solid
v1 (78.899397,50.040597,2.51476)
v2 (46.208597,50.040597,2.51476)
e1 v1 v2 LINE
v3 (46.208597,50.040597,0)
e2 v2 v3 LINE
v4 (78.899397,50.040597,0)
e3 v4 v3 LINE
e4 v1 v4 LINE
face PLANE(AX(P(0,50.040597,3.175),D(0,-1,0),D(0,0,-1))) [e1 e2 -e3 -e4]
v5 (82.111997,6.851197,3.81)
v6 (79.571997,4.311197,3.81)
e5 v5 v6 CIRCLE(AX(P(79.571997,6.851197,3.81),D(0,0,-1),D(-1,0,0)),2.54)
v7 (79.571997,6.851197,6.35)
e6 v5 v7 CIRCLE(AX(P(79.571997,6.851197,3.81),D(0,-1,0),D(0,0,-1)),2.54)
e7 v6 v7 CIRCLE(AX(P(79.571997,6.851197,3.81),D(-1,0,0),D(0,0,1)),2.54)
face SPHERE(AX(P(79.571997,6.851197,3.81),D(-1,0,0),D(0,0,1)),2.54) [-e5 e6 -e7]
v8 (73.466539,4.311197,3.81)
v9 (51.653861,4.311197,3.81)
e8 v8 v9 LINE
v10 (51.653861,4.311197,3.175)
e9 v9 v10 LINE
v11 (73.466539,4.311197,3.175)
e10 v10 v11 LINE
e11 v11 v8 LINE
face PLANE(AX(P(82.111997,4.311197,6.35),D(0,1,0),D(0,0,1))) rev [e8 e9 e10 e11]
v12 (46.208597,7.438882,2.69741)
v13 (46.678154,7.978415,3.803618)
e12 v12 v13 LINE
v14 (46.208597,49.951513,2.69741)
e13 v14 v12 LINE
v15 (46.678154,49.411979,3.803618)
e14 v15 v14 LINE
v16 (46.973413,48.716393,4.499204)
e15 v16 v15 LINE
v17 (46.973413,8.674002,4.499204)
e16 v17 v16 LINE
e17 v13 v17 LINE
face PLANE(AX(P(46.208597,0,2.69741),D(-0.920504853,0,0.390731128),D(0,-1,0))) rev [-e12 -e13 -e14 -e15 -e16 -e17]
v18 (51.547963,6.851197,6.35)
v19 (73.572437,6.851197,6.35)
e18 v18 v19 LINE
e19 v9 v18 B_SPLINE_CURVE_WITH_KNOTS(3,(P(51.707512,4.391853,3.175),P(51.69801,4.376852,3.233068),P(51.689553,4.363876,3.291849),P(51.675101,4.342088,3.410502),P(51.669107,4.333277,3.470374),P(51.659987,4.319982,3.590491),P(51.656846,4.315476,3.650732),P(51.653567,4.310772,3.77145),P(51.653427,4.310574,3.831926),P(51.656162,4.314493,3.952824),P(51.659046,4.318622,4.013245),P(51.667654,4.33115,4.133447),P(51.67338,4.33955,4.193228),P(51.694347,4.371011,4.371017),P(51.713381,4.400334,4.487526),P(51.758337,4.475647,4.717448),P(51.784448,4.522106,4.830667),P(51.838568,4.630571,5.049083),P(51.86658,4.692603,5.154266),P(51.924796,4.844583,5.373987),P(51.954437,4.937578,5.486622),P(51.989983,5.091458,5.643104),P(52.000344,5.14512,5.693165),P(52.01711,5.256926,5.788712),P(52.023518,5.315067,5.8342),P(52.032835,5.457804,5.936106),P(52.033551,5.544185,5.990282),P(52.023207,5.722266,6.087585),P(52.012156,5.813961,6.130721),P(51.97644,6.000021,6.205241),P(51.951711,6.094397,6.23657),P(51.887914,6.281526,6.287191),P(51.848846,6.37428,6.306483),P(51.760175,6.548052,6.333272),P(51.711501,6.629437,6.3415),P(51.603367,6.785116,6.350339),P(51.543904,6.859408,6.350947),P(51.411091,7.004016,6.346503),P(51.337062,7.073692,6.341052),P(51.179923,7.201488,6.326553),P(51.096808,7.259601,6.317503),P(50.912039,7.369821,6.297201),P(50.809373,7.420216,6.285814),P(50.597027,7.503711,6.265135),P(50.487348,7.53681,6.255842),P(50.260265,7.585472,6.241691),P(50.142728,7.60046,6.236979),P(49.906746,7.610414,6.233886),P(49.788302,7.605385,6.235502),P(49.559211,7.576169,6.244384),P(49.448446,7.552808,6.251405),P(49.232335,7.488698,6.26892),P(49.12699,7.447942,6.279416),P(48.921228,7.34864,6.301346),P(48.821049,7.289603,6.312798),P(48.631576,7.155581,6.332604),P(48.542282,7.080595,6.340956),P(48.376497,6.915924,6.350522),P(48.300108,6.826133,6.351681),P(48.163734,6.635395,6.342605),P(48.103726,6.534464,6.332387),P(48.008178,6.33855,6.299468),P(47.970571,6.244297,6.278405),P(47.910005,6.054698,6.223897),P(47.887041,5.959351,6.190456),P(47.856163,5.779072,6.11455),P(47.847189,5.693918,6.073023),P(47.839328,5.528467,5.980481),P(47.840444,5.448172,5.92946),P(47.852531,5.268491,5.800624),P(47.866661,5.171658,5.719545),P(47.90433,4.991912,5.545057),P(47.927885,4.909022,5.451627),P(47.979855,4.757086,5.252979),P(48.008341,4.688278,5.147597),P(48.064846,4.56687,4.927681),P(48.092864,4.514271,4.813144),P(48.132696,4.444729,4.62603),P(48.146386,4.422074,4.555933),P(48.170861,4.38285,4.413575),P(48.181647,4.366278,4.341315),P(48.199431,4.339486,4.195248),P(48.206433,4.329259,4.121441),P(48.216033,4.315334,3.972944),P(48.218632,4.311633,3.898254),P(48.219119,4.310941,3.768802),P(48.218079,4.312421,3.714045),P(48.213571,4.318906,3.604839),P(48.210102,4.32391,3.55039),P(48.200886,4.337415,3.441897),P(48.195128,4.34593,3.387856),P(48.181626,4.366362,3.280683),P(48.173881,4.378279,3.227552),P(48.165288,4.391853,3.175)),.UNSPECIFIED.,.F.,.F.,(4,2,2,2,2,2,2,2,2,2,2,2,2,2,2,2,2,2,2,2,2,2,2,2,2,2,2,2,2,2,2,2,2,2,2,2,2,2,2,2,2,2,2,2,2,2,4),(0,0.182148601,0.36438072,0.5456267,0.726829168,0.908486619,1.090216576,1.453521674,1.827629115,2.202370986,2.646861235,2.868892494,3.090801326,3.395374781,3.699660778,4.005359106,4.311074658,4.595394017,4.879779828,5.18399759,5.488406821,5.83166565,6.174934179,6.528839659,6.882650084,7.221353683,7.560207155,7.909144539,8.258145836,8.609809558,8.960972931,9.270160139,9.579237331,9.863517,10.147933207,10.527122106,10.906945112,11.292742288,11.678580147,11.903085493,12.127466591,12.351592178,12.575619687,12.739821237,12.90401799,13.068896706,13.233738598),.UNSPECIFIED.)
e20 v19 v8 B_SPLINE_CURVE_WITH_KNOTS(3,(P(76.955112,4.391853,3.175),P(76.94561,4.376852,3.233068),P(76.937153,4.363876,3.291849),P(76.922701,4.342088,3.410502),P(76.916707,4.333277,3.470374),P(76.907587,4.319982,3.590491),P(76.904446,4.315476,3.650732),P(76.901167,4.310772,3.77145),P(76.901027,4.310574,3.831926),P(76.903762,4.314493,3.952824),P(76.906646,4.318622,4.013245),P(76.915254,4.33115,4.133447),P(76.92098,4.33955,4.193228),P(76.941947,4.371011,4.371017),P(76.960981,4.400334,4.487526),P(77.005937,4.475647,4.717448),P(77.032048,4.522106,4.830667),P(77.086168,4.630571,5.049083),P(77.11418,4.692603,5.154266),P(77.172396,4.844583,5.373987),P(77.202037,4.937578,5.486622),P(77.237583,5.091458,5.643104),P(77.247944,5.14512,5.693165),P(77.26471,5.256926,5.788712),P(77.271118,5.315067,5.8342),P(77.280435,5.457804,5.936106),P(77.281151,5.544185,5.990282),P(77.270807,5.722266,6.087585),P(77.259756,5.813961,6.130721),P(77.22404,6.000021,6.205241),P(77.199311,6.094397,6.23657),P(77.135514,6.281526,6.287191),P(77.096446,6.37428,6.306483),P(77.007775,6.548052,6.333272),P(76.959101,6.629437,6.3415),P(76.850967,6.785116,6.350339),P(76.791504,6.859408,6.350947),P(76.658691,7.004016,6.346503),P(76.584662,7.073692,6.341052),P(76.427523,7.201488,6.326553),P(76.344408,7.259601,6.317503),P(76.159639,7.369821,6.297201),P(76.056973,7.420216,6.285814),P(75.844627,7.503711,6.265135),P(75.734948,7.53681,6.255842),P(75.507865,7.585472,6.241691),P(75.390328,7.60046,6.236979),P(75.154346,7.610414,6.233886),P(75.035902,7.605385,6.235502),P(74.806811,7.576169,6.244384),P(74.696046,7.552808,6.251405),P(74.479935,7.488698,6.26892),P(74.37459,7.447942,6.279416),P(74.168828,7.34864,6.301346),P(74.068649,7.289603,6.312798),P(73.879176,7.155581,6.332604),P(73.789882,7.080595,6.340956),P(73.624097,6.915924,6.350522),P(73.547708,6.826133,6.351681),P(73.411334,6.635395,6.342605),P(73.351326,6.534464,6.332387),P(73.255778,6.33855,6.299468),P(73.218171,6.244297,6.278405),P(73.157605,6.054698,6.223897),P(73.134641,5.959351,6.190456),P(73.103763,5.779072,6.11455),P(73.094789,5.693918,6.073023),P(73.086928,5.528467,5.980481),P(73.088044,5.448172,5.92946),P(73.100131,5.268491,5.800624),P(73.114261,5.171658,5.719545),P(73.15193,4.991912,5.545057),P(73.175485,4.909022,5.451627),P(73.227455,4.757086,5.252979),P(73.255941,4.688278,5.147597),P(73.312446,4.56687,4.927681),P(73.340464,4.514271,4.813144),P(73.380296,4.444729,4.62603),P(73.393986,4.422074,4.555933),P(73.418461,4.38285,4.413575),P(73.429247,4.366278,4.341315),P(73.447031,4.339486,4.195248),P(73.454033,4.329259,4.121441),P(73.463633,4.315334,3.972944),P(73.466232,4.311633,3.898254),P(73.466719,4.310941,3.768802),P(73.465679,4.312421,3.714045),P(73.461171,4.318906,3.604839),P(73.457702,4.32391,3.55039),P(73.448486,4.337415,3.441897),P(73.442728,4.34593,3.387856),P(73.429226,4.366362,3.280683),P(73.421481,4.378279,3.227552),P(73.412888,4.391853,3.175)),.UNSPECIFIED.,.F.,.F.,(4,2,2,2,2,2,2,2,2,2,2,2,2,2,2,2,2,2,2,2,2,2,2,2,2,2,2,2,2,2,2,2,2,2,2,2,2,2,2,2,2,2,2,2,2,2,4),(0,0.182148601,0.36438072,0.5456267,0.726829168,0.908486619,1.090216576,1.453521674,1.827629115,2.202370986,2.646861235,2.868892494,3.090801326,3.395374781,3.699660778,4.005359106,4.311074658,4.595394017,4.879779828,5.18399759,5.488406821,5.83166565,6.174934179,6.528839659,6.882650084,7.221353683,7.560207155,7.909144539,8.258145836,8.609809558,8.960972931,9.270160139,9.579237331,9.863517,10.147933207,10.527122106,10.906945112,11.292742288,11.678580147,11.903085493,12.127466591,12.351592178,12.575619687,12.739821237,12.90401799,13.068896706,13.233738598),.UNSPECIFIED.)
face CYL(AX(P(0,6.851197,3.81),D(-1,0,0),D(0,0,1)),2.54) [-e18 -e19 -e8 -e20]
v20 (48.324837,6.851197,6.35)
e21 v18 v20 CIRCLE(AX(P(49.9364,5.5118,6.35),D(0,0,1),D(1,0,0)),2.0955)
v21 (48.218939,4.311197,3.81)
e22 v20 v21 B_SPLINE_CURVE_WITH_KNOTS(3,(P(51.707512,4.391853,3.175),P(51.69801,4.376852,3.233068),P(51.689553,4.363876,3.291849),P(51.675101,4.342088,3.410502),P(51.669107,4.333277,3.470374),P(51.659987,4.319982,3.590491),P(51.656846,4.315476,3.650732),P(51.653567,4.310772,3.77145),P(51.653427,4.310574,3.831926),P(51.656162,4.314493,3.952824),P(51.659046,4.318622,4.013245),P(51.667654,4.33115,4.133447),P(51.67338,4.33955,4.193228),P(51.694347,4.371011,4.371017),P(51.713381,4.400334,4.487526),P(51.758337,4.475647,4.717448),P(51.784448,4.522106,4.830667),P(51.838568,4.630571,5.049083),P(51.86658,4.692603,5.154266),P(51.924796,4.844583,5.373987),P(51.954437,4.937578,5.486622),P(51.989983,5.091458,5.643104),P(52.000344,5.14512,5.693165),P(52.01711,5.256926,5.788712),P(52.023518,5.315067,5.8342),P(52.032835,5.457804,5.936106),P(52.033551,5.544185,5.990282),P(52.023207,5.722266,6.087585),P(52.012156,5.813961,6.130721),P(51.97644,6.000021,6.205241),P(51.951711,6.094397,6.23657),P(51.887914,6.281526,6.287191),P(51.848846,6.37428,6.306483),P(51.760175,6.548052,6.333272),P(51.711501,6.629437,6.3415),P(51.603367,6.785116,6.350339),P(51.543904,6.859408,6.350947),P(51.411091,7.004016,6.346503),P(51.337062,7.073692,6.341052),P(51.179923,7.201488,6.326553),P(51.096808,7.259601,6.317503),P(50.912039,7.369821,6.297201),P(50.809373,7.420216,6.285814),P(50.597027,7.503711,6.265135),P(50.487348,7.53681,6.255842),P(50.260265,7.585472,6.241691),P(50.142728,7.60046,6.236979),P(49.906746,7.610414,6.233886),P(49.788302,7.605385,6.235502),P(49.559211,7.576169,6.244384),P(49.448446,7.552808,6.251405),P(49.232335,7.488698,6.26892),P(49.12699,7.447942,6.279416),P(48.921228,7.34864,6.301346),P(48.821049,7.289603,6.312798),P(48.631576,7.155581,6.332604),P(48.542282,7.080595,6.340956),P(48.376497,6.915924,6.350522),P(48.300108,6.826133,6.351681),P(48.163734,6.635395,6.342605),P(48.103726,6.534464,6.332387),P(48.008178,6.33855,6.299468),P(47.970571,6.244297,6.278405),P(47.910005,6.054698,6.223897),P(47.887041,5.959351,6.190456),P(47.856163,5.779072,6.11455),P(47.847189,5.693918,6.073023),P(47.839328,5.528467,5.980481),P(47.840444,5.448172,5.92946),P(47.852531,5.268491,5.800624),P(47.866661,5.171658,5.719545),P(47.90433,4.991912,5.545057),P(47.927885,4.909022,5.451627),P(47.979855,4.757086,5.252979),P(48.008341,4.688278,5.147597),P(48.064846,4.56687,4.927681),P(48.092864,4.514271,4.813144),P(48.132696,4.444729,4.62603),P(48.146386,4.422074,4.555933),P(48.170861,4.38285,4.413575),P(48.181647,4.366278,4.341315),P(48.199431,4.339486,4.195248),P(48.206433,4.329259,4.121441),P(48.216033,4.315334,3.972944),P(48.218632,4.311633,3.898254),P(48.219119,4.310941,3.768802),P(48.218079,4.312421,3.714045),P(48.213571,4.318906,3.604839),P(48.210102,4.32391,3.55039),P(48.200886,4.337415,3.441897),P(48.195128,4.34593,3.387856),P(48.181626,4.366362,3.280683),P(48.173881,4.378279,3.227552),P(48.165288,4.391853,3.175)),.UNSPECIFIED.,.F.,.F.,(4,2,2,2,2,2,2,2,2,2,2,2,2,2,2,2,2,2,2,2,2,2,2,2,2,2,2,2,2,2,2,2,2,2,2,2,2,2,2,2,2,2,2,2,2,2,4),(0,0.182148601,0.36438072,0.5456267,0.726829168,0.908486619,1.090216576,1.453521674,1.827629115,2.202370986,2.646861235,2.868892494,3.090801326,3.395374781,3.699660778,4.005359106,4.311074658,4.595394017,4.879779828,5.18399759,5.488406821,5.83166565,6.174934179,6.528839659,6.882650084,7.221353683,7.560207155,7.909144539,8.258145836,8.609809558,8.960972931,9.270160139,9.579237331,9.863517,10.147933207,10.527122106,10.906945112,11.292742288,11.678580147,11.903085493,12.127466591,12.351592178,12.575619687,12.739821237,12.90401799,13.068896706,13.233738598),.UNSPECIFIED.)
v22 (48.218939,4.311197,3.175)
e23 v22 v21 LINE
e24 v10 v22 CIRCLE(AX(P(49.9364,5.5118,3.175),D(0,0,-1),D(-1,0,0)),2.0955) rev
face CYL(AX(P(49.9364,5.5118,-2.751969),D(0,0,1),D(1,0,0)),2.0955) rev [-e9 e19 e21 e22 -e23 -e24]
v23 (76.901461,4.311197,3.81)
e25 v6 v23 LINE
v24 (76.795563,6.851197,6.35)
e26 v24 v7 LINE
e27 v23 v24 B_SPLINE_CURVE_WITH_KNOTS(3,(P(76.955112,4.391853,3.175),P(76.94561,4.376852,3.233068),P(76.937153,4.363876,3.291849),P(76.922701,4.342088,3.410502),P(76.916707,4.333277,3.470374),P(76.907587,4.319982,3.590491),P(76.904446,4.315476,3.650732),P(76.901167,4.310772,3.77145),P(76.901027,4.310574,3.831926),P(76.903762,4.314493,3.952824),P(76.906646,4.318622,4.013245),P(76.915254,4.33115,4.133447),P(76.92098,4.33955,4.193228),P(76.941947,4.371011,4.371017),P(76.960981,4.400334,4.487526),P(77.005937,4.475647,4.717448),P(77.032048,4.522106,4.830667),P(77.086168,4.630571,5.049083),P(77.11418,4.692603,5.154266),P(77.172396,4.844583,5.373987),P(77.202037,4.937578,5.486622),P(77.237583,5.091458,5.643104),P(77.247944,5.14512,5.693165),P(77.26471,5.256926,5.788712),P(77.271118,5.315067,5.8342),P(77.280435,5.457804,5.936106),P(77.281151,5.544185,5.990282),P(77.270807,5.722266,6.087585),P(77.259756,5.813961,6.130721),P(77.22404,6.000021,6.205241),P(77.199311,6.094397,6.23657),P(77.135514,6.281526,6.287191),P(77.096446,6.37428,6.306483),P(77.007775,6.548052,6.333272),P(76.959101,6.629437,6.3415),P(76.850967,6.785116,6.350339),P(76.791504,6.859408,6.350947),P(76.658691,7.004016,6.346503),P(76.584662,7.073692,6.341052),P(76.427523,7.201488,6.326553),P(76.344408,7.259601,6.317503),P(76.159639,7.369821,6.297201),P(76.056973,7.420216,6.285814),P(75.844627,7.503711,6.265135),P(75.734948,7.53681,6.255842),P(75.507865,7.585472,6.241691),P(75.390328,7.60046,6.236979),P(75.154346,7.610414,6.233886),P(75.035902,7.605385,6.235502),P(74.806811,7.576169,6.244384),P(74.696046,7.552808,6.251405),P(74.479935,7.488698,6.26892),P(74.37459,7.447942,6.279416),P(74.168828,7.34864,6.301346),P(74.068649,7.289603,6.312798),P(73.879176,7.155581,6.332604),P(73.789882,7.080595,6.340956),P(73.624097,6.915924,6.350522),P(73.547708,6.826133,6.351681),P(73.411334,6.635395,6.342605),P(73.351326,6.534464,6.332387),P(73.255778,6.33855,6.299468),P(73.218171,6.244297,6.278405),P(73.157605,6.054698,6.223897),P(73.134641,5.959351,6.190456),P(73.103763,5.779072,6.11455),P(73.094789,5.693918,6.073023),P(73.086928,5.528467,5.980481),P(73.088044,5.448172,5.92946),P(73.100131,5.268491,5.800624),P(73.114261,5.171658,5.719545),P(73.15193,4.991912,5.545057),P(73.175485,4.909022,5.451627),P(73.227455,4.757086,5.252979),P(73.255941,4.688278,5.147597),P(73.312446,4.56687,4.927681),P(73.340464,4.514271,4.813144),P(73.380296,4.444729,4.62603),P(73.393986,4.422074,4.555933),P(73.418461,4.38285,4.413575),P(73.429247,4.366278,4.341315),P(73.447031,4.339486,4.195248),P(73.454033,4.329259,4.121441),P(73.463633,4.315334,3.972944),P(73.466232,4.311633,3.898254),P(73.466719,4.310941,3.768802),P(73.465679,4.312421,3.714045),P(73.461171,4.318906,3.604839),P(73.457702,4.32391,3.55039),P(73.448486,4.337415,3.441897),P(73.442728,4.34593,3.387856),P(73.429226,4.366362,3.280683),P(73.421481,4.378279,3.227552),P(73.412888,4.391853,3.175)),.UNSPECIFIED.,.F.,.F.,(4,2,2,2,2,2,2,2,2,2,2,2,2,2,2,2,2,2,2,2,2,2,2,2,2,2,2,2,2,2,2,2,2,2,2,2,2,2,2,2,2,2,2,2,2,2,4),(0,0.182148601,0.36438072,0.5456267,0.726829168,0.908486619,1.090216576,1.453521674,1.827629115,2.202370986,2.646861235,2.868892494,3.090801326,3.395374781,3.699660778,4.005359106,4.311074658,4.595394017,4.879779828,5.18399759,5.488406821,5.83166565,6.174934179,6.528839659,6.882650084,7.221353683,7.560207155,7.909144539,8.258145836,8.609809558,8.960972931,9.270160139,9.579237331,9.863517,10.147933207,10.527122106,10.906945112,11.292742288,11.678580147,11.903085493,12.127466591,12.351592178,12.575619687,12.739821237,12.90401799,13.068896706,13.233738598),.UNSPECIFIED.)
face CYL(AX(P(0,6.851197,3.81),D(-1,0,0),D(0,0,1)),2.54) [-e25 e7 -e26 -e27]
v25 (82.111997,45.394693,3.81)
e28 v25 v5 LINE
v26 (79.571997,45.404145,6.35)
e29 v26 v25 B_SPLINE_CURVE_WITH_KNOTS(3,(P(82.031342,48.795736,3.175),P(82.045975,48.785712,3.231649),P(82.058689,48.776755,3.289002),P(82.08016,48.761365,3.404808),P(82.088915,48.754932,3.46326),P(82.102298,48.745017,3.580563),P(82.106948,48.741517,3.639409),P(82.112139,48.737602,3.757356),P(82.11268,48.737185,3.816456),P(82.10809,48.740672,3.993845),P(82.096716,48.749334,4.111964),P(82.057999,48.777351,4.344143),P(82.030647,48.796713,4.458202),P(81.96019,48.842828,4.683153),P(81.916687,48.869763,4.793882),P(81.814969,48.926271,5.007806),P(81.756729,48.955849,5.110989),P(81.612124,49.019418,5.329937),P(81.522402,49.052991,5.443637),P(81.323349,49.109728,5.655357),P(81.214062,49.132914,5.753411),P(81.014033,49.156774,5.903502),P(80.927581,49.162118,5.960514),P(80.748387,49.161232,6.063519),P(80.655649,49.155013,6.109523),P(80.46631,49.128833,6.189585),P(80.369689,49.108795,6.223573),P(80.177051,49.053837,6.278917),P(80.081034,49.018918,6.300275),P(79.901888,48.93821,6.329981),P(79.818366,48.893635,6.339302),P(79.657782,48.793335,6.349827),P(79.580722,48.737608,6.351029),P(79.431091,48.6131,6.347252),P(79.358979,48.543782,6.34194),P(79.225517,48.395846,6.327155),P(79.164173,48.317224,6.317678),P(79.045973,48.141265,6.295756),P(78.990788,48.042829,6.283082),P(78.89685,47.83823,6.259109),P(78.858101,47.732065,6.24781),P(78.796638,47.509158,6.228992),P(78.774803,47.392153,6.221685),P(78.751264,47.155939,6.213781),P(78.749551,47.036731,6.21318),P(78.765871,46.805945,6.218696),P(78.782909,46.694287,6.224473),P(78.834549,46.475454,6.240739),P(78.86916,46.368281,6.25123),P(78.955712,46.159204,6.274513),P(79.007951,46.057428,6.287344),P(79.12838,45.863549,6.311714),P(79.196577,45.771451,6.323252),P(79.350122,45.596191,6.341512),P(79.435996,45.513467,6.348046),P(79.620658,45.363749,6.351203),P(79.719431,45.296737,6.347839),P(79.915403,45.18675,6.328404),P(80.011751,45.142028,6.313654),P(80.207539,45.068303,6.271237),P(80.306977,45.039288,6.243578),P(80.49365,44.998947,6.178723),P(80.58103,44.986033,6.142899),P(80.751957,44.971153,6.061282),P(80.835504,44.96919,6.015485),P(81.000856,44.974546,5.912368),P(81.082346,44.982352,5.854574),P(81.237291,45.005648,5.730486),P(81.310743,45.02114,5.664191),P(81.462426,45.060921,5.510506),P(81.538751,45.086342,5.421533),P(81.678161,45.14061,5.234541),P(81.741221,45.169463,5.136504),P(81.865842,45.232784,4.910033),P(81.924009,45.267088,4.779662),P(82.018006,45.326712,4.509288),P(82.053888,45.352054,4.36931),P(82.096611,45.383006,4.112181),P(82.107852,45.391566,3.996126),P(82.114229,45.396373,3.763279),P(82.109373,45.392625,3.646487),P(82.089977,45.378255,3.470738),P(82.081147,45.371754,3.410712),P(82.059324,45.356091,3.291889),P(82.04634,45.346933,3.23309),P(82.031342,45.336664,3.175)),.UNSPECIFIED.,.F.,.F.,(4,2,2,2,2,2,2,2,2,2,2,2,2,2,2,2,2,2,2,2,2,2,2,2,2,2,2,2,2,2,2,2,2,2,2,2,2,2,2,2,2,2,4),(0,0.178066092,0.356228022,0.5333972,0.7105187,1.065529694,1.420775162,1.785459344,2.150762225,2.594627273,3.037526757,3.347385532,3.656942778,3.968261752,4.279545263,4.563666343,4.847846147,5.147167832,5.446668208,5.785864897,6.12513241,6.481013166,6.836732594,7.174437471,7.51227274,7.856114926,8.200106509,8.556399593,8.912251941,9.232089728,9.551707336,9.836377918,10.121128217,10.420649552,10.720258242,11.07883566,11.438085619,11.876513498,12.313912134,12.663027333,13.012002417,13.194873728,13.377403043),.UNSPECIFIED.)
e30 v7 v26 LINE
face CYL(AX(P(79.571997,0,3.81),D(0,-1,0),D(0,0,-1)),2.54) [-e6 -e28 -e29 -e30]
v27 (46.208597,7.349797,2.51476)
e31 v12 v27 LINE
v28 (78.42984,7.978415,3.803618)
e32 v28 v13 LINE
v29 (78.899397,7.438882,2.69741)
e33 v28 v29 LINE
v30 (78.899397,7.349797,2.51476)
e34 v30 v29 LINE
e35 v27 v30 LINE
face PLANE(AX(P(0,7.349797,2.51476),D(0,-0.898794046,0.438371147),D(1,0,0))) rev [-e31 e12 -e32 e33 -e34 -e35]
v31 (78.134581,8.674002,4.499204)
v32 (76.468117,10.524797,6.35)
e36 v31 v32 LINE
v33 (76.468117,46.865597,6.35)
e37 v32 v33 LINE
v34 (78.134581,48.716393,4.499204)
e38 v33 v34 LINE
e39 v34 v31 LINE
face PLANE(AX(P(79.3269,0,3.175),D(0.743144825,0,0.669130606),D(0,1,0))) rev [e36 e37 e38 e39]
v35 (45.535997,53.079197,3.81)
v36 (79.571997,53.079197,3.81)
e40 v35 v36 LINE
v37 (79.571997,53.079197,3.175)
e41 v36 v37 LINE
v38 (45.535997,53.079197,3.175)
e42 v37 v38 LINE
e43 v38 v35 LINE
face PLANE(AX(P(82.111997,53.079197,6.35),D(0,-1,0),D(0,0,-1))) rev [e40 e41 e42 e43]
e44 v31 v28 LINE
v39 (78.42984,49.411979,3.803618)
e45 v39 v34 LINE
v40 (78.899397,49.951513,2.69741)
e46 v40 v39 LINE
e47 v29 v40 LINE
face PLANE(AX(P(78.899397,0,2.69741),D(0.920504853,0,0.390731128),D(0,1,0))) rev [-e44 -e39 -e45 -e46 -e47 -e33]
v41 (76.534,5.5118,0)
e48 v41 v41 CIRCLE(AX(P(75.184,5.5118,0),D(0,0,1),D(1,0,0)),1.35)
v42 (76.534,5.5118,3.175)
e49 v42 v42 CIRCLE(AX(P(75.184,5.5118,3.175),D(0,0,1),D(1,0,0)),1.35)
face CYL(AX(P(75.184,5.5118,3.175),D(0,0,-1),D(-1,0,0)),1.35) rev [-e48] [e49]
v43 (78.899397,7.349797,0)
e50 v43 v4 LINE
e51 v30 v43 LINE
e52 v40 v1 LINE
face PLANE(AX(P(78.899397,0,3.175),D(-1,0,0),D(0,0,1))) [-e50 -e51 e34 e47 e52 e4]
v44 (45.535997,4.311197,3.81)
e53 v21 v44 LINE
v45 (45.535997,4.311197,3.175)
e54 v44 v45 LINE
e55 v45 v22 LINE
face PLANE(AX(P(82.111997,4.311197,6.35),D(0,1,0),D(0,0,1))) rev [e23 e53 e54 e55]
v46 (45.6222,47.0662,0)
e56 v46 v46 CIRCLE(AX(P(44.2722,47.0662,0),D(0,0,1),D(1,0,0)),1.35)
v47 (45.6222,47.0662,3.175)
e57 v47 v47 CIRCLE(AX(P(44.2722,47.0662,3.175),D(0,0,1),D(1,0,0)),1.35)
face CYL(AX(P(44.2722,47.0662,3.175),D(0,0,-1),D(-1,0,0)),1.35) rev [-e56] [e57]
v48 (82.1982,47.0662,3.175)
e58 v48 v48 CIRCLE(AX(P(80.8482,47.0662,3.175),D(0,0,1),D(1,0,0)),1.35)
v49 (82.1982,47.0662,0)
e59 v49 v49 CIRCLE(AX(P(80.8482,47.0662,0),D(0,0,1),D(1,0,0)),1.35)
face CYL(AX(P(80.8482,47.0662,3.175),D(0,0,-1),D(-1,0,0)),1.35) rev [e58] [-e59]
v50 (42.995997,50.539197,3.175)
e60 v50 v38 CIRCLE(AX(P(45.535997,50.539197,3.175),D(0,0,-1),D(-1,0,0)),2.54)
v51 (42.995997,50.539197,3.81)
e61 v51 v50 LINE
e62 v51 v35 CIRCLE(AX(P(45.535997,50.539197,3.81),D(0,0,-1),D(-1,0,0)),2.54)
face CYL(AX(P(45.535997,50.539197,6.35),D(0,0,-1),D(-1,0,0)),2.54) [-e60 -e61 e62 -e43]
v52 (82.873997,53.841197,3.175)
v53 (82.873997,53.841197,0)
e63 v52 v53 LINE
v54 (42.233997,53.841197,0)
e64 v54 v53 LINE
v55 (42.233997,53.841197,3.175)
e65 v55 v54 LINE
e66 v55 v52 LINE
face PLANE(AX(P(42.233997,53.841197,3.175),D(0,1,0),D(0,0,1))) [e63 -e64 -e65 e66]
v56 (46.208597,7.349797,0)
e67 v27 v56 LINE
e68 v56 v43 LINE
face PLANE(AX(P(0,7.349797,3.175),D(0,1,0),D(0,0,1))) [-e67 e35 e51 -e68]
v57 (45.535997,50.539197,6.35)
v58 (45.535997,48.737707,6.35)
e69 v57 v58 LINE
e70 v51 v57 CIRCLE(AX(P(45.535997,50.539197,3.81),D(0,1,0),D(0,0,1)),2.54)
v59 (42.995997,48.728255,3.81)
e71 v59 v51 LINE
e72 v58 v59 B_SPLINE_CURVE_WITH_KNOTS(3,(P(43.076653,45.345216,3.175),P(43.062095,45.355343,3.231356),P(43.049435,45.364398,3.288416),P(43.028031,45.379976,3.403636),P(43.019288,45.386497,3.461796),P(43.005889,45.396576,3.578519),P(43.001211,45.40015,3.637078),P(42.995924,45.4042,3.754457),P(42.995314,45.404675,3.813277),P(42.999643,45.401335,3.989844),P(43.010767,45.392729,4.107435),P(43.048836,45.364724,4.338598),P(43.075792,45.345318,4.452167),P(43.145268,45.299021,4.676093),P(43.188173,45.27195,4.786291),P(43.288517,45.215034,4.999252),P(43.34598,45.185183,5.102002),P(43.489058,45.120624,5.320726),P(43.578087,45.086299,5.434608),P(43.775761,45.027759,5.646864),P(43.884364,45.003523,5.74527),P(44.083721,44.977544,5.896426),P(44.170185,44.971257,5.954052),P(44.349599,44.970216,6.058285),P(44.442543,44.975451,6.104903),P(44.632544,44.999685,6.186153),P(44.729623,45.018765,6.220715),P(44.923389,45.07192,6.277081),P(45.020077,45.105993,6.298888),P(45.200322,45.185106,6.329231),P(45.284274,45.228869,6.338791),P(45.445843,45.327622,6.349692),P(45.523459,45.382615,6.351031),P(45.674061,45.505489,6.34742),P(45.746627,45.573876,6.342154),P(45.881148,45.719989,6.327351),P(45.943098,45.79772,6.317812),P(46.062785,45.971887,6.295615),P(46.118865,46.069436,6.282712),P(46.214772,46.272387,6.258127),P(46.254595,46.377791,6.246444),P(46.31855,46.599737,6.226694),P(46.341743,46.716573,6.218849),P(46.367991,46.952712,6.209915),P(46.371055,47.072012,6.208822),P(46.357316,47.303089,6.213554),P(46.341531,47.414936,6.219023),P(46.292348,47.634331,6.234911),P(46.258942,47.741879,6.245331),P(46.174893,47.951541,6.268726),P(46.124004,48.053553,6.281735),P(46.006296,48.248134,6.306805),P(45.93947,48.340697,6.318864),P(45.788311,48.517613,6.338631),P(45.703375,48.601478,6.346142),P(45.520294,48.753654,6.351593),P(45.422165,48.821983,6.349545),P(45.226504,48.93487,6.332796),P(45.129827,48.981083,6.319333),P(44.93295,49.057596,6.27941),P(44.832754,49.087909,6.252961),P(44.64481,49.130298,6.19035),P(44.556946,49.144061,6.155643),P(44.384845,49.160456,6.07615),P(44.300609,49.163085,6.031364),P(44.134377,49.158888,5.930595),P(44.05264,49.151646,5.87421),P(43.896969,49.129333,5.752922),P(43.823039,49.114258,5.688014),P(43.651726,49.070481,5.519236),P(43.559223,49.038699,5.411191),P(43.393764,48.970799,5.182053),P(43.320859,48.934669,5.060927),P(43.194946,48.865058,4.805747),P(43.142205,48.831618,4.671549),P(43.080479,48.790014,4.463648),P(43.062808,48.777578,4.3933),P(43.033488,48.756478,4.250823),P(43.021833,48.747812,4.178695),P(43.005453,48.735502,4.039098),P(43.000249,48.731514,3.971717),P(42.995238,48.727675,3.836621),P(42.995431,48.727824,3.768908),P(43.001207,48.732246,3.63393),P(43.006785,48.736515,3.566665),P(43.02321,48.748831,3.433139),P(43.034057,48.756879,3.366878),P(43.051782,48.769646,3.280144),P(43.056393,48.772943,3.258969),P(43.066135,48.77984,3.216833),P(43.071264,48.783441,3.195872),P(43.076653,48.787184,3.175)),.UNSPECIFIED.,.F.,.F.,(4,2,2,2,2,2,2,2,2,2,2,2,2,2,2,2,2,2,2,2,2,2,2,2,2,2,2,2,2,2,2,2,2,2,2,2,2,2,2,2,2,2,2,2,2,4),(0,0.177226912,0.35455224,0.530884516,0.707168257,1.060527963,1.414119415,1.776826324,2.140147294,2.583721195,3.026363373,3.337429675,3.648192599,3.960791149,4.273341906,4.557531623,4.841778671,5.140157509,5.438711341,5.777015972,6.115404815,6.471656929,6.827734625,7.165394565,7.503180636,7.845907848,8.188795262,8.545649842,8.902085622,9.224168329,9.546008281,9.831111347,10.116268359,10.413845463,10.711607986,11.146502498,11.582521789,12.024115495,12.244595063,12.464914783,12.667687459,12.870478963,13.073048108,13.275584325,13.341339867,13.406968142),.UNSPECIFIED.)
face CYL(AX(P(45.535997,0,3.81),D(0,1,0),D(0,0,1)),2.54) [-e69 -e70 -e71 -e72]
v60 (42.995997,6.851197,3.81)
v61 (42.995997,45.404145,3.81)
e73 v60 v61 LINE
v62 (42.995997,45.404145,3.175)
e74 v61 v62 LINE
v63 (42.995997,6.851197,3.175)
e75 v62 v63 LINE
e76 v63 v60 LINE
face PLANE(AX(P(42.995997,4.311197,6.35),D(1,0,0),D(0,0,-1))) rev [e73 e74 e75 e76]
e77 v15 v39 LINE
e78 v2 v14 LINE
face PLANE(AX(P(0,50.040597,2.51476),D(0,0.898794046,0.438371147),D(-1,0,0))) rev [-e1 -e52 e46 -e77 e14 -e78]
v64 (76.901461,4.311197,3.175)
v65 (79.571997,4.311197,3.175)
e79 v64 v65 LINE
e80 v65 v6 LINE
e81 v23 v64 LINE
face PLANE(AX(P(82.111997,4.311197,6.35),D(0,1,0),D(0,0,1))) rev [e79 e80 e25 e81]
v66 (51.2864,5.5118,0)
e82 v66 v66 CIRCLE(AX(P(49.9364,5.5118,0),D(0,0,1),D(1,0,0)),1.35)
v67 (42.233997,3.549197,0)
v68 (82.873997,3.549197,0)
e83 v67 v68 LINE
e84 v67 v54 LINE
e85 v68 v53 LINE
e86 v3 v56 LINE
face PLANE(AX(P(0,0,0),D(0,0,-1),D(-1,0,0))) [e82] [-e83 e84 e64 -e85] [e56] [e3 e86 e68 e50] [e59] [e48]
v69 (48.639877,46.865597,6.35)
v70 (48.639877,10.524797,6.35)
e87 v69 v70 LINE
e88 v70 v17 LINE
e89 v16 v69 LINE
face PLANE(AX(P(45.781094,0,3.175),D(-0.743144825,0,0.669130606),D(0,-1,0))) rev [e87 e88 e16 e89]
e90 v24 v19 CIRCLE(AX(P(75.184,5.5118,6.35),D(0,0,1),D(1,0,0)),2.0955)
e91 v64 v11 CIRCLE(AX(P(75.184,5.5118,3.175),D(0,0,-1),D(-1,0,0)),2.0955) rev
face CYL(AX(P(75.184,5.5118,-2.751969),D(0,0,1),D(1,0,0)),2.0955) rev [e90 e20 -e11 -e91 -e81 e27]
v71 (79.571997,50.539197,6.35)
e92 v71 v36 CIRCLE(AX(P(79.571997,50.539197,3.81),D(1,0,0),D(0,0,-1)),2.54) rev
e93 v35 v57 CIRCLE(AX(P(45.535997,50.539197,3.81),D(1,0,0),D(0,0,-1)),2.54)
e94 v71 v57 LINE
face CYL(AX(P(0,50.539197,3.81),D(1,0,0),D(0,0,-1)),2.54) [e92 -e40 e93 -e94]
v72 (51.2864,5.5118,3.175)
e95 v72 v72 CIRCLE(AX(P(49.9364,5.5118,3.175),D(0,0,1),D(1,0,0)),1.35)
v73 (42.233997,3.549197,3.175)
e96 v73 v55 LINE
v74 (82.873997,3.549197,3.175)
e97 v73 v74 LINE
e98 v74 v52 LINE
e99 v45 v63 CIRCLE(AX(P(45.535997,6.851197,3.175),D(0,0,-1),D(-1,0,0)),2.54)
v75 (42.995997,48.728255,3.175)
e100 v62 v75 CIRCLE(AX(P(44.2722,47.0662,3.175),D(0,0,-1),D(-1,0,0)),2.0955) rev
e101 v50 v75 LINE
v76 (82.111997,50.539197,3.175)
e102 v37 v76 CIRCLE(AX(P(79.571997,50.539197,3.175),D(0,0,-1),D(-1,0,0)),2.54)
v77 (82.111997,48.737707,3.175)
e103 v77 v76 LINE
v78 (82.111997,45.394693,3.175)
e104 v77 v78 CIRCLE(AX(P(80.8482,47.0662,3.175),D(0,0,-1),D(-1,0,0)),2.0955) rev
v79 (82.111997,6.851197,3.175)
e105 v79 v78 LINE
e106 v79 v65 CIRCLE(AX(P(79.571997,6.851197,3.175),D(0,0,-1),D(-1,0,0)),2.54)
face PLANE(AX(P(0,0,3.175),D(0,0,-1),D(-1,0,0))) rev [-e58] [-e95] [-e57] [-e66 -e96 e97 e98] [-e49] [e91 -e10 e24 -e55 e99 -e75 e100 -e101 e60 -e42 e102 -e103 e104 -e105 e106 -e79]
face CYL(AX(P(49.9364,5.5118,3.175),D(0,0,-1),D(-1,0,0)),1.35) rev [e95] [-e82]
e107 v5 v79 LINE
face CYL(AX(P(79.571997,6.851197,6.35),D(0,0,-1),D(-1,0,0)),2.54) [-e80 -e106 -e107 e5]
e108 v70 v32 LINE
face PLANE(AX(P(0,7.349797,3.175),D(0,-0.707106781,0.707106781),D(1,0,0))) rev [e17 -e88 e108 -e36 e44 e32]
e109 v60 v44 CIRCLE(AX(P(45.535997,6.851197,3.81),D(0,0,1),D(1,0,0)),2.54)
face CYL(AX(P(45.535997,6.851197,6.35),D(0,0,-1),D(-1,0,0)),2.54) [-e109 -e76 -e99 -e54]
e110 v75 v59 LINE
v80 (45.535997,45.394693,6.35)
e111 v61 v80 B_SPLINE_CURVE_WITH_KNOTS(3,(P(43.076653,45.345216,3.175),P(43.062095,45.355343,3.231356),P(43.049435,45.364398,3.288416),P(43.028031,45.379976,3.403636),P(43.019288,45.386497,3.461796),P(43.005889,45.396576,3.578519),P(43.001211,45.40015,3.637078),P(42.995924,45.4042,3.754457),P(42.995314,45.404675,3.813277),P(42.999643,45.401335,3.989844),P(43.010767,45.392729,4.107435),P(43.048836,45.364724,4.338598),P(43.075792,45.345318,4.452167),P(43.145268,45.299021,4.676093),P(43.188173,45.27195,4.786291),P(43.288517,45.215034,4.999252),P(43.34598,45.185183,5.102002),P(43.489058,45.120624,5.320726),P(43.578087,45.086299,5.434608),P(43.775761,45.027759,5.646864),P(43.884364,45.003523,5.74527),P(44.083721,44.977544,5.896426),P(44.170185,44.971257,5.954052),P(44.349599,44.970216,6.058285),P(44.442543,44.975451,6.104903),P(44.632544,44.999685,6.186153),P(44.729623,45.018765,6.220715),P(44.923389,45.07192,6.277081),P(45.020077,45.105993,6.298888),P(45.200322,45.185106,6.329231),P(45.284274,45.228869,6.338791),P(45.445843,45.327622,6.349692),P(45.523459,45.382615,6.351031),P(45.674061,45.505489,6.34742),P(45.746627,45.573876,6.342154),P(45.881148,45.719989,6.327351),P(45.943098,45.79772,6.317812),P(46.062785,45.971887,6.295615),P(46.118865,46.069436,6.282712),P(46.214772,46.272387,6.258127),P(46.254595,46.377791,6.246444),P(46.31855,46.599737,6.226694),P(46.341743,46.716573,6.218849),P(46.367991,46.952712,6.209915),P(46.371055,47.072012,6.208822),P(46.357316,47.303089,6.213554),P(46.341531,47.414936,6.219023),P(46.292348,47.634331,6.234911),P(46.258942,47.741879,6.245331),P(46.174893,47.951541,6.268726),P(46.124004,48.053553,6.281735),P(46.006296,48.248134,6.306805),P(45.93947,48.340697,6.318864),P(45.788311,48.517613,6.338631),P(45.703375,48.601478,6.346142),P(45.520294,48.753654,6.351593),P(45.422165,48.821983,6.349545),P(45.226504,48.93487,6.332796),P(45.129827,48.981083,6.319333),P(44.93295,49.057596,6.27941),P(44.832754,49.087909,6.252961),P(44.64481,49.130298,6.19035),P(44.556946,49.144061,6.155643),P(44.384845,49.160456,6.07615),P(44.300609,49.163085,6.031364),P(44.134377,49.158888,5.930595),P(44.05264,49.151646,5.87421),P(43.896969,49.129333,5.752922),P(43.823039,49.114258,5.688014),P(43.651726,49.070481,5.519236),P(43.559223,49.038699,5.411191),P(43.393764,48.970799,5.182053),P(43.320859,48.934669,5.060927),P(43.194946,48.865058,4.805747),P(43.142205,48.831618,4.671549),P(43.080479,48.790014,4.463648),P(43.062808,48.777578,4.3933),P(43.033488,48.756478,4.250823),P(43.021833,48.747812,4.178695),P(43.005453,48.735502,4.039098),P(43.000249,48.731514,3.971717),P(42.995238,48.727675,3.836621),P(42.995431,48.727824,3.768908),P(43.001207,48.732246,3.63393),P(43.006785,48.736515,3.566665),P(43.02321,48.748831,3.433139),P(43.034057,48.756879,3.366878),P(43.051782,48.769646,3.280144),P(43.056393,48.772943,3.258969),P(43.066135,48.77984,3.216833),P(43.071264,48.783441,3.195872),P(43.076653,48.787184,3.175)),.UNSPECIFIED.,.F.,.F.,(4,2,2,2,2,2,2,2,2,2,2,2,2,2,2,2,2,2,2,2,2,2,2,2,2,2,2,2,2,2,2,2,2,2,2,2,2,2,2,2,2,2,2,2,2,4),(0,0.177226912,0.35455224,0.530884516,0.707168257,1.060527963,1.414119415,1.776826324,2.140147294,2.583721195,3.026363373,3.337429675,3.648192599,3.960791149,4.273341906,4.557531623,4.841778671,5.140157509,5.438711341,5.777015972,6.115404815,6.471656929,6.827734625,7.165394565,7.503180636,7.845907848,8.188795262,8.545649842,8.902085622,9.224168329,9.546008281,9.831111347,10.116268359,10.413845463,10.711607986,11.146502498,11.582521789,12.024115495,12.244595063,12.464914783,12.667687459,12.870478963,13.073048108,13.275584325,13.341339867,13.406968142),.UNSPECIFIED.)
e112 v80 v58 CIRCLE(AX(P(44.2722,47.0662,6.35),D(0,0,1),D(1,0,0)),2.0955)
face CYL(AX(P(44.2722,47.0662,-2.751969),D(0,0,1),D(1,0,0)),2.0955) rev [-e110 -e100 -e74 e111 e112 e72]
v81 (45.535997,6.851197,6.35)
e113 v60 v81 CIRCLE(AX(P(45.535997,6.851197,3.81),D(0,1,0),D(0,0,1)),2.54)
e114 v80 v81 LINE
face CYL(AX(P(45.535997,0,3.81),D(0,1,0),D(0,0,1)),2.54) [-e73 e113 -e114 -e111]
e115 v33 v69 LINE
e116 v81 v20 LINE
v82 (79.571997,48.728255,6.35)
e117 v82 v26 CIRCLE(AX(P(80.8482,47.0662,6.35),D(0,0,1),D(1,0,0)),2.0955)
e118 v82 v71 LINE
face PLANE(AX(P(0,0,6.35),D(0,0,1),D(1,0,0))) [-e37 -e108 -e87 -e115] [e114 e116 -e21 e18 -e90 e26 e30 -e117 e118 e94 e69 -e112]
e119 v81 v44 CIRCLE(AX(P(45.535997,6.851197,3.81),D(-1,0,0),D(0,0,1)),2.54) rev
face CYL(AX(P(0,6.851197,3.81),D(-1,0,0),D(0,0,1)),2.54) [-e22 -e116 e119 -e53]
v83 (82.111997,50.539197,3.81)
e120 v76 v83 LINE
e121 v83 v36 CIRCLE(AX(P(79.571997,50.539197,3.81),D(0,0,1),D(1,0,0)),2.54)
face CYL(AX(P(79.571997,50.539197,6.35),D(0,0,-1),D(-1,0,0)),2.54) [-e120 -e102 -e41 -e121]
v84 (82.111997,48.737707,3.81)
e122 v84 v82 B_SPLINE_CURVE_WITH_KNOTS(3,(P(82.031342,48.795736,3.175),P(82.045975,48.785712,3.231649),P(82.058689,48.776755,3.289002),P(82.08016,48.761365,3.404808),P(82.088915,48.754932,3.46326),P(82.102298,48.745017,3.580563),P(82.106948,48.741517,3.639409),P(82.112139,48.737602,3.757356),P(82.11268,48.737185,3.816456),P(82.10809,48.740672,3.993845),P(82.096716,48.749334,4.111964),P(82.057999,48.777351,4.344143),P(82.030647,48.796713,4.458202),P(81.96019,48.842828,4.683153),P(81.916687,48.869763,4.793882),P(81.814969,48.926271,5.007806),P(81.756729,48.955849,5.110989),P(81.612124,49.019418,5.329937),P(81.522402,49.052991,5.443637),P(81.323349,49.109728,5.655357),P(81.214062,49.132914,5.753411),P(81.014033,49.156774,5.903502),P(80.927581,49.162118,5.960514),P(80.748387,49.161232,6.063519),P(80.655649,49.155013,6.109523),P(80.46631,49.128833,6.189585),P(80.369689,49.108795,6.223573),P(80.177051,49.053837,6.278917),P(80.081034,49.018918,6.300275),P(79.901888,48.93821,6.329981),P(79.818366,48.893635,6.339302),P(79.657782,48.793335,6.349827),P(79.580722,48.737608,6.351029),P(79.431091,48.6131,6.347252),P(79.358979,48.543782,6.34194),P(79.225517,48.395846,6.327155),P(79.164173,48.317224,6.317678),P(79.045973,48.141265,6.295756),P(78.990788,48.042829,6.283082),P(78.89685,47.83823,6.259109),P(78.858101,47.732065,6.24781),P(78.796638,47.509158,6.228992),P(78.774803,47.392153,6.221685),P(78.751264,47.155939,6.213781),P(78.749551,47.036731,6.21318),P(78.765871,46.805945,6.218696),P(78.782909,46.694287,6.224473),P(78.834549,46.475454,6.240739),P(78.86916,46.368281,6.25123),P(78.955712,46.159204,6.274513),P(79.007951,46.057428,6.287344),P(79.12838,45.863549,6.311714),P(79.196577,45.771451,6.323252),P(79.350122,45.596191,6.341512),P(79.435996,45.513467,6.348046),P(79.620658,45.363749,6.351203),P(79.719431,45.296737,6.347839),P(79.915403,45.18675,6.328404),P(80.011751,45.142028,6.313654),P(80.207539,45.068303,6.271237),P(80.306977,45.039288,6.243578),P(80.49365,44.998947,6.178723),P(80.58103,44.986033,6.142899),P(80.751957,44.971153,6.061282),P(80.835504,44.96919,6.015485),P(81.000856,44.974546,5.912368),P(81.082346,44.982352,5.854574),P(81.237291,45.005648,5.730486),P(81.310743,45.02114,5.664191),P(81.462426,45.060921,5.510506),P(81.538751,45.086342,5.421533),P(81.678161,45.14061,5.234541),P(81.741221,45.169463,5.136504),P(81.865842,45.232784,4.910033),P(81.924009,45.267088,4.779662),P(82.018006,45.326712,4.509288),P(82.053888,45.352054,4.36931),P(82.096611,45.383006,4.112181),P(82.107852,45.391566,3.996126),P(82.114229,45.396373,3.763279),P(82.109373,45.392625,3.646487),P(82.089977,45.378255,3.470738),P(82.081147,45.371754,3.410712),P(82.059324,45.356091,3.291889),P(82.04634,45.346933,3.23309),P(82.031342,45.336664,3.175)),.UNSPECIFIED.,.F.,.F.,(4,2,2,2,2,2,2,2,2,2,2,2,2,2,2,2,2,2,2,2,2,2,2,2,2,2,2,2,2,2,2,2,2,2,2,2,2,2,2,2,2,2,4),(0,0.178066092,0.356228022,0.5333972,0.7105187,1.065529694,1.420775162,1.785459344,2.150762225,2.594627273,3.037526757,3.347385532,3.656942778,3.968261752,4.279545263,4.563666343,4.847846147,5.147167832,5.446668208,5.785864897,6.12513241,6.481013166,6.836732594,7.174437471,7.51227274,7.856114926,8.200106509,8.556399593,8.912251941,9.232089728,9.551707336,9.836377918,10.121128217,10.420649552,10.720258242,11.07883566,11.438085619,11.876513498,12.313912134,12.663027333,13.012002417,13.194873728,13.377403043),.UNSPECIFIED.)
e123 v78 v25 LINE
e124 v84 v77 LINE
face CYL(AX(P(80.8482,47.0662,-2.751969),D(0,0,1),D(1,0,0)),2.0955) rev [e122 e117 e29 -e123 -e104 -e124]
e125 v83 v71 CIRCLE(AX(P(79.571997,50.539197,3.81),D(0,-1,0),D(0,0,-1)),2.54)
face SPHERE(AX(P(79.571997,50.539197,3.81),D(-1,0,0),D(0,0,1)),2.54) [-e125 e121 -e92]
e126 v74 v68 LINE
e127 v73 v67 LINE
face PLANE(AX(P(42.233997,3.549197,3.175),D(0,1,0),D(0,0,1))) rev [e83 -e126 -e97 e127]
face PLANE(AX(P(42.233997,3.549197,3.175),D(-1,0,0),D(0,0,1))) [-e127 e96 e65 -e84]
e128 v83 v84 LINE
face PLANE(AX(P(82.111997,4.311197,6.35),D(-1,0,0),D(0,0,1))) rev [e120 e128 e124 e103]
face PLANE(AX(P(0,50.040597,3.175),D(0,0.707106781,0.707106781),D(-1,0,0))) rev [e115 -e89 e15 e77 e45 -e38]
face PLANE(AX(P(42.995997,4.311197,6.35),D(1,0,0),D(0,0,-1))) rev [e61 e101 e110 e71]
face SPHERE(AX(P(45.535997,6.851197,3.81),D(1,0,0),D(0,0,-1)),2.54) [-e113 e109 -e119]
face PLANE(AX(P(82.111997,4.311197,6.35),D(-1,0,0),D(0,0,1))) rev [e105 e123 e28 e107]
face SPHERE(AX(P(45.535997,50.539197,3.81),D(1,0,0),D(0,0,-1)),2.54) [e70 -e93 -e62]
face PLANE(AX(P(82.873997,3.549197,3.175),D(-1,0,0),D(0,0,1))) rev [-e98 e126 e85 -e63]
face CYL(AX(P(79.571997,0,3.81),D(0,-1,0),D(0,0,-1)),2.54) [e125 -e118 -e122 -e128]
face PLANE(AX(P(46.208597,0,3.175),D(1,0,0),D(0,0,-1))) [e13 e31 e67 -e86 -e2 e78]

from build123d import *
from OCP.BRepFilletAPI import BRepFilletAPI_MakeChamfer

# Parameters (mm, degrees)
MODEL_W             = 40.64000000000001
MODEL_H             = 50.291999999999994
MODEL_R             = 1.3499999999999979
MODEL_R_2           = 1.3499999999999985
MODEL_R_3           = 1.3500000000000056
MODEL_R_4           = 1.3500000000000065
MODEL_W_2           = 32.69080000000003
MODEL_H_2           = 42.690799999999996
BOSS_EXTRUDE1_DEPTH = 3.175
SKETCH1_W           = 32.69080000000003
SKETCH1_H           = 42.690799999999996
SKETCH1_W_2         = 27.828239916797088
SKETCH1_H_2         = 36.340799999999994
BOSS_EXTRUDE2_DEPTH = 3.175
SKETCH2_W           = 39.116000000000014
SKETCH2_H           = 48.768
SKETCH2_W_2         = 32.69080000000003
SKETCH2_H_2         = 42.690799999999996
BOSS_EXTRUDE4_DEPTH = 3.175
FILLET1_R           = 2.54
FILLET2_R           = 2.54
CHAMFER9_SIZE       = 3.175
CHAMFER9_SIZE_2     = 2.858782841
CHAMFER10_SIZE      = 3.175
SKETCH4_R           = 1.3500000000000065
SKETCH4_R_2         = 1.3499999999999979
SKETCH4_R_3         = 1.3499999999999985
SKETCH4_R_4         = 1.3500000000000056
CUT_EXTRUDE1_DEPTH  = 100.03179502787644
CHAMFER11_SIZE      = 0.889
CHAMFER11_SIZE2     = 0.6602398251627483
CHAMFER12_SIZE      = 1.143
CHAMFER12_SIZE2     = 0.9523797142277386
CUT_EXTRUDE2_START  = -3.175
SKETCH5_R           = 2.0955000000000017
SKETCH5_R_2         = 2.095500000000001
CUT_EXTRUDE2_DEPTH  = 3.175


with BuildPart() as part:
    # Model → Boss-Extrude1 (new body)
    with BuildSketch(Plane.XY):
        with Locations((62.55399712221356, 28.695197306808385)):
            Rectangle(MODEL_W, MODEL_H)
        with Locations((44.272200000000005, 47.066199999999995)):
            Circle(MODEL_R, mode=Mode.SUBTRACT)
        with Locations((49.9364, 5.5118)):
            Circle(MODEL_R_2, mode=Mode.SUBTRACT)
        with Locations((75.184, 5.5118)):
            Circle(MODEL_R_3, mode=Mode.SUBTRACT)
        with Locations((80.84819999999999, 47.066199999999995)):
            Circle(MODEL_R_4, mode=Mode.SUBTRACT)
        with Locations((62.55399712221356, 28.69519730680839)):
            Rectangle(MODEL_W_2, MODEL_H_2, mode=Mode.SUBTRACT)
    extrude(amount=BOSS_EXTRUDE1_DEPTH)



with BuildPart() as body_2:
    # Sketch1 → Boss-Extrude2 (new body)
    with BuildSketch(Plane.XY.offset(3.175)):
        with Locations((62.55399712221356, 28.69519730680839)):
            Rectangle(SKETCH1_W, SKETCH1_H)
        with Locations((62.55399712221356, 28.695197306808385)):
            Rectangle(SKETCH1_W_2, SKETCH1_H_2, mode=Mode.SUBTRACT)
    extrude(amount=BOSS_EXTRUDE2_DEPTH)


with BuildPart() as part_1:
    add(part.part)

    add(body_2.part)  # Boss-Extrude4 merges body 2
    # Sketch2 → Boss-Extrude4 (add)
    with BuildSketch(Plane.XY.offset(3.175)):
        with Locations((62.55399712221356, 28.69519730680838)):
            Rectangle(SKETCH2_W, SKETCH2_H)
        with Locations((62.55399712221356, 28.69519730680839)):
            Rectangle(SKETCH2_W_2, SKETCH2_H_2, mode=Mode.SUBTRACT)
    extrude(amount=BOSS_EXTRUDE4_DEPTH)

    # Fillet1
    fillet1_edges = [part_1.edges().sort_by_distance(p)[0] for p in [
        (62.55399712221356, 4.311197306808385, 6.35),
        (62.55399712221356, 53.07919730680838, 6.35),
    ]]
    fillet(fillet1_edges, radius=FILLET1_R)

    # Fillet2
    fillet2_edges = [part_1.edges().sort_by_distance(p)[0] for p in [
        (82.11199712221357, 52.335248531022216, 5.6060512242138305),
        (82.11199712221357, 5.055146082594554, 5.606051224213831),
        (42.99599712221355, 4.311197306808385, 3.4924999999999997),
        (42.99599712221355, 53.07919730680838, 3.4924999999999997),
        (42.99599712221355, 52.33524853102221, 5.606051224213832),
        (42.99599712221355, 5.055146082594553, 5.6060512242138305),
        (42.99599712221355, 28.69519730680838, 6.35),
        (82.11199712221357, 28.695197306808385, 6.35),
        (82.11199712221357, 53.07919730680838, 3.4924999999999997),
        (82.11199712221357, 4.311197306808385, 3.4924999999999997),
    ]]
    fillet(fillet2_edges, radius=FILLET2_R)

    # Chamfer9
    # the kernel refuses this chamfer: 3.175, 2.858782841 mm, written as the material it takes off along each edge
    with BuildSketch(Plane(origin=(48.639877163815015, 46.86559730680839, 3.175), x_dir=(0, 0, 1), z_dir=(0, -1, 0))) as chamfer9_piece_1_section:
        Polygon((CHAMFER9_SIZE, 0), (0, CHAMFER9_SIZE_2), (0, 0), align=None)
    chamfer9_piece_1 = extrude(amount=36.3408, mode=Mode.PRIVATE)
    chamfer9_piece_1 = split(chamfer9_piece_1, bisect_by=Plane(origin=(46.20859712221354, 46.86559730680839, 3.175), z_dir=(1, 0, 0)), keep=Keep.TOP, mode=Mode.PRIVATE)
    add(chamfer9_piece_1, mode=Mode.SUBTRACT)
    with BuildSketch(Plane(origin=(76.4681170806121, 10.524797306808388, 3.175), x_dir=(0, 0, 1), z_dir=(0, 1, 0))) as chamfer9_piece_2_section:
        Polygon((CHAMFER9_SIZE, 0), (0, CHAMFER9_SIZE_2), (0, 0), align=None)
    chamfer9_piece_2 = extrude(amount=36.3408, mode=Mode.PRIVATE)
    chamfer9_piece_2 = split(chamfer9_piece_2, bisect_by=Plane(origin=(78.89939712221357, 10.524797306808388, 3.175), z_dir=(-1, 0, 0)), keep=Keep.TOP, mode=Mode.PRIVATE)
    add(chamfer9_piece_2, mode=Mode.SUBTRACT)

    # Chamfer10
    # the kernel refuses this chamfer: 3.175 mm, written as the material it takes off along each edge
    with BuildSketch(Plane(origin=(46.208597122214, 46.865597306808, 3.175), x_dir=(0, 1.2309e-13, 1), z_dir=(1, 0, 0))) as chamfer10_piece_1_section:
        Polygon((CHAMFER10_SIZE, 0), (3.908e-13, -CHAMFER10_SIZE), (0, 0), align=None)
    chamfer10_piece_1 = extrude(amount=32.690799999999996, mode=Mode.PRIVATE)
    chamfer10_piece_1 = split(chamfer10_piece_1, bisect_by=Plane(origin=(64.4986511687098, 46.865597306808, 19.643438635932224), z_dir=(-0.7431448254361507, 0, -0.6691306064046639)), keep=Keep.TOP, mode=Mode.PRIVATE)
    chamfer10_piece_1 = split(chamfer10_piece_1, bisect_by=Plane(origin=(45.97250261720881, 46.865597306808, 3.387580447169522), z_dir=(0.7431448254361507, 0, -0.6691306064046639)), keep=Keep.TOP, mode=Mode.PRIVATE)
    add(chamfer10_piece_1, mode=Mode.SUBTRACT)
    with BuildSketch(Plane(origin=(78.899397122214, 10.524797306808, 3.175), x_dir=(1.1e-16, -1, 0), z_dir=(-1, -1.1e-16, 0))) as chamfer10_piece_2_section:
        Polygon((CHAMFER10_SIZE, 0), (-3.908e-13, CHAMFER10_SIZE), (0, 0), align=None)
    chamfer10_piece_2 = extrude(amount=32.690799999999996, mode=Mode.PRIVATE)
    chamfer10_piece_2 = split(chamfer10_piece_2, bisect_by=Plane(origin=(79.13549162721864, 10.524797306808, 3.38758044716903), z_dir=(-0.7431448254361507, 0, -0.6691306064046639)), keep=Keep.TOP, mode=Mode.PRIVATE)
    chamfer10_piece_2 = split(chamfer10_piece_2, bisect_by=Plane(origin=(60.609343075717646, 10.524797306808, 19.64343863593272), z_dir=(0.7431448254361507, 0, -0.6691306064046639)), keep=Keep.TOP, mode=Mode.PRIVATE)
    add(chamfer10_piece_2, mode=Mode.SUBTRACT)

    # Sketch4 → Cut-Extrude1 (cut, through all)
    with BuildSketch(Plane(origin=(0, 0, 0), x_dir=(-1, 0, 0), z_dir=(0, 0, -1))):
        with Locations(Location((-80.84819999999999, 47.066199999999995, 0), (0, 0, 19.032198816))):
            Circle(SKETCH4_R)
        with Locations(Location((-44.272200000000005, 47.066199999999995, 0), (0, 0, 19.032198816))):
            Circle(SKETCH4_R_2)
        with Locations(Location((-49.9364, 5.5118, 0), (0, 0, 297.210156983))):
            Circle(SKETCH4_R_3)
        with Locations(Location((-75.184, 5.5118, 0), (0, 0, 297.210156983))):
            Circle(SKETCH4_R_4)
    extrude(amount=-CUT_EXTRUDE1_DEPTH, mode=Mode.SUBTRACT)

    # Chamfer11: one chamfer whose edges measure the first distance from different faces: ONE call of the kernel's chamfer builder (chamfer() names one face for all edges)
    chamfer11_edges_1 = [part_1.edges().sort_by_distance(p)[0] for p in [
        (62.55399712221356, 50.04059730680839, 3.175),
    ]]
    chamfer11_side_1 = [part_1.faces().sort_by_distance(p)[0] for p in [
        (62.55399712221734, 48.49951336002211, 4.716083946785889),
    ]]
    chamfer11_edges_2 = [part_1.edges().sort_by_distance(p)[0] for p in [
        (62.55399712221356, 7.349797306808389, 3.175),
    ]]
    chamfer11_side_2 = [part_1.faces().sort_by_distance(p)[0] for p in [
        (62.553997122213964, 8.890881253594266, 4.716083946786265),
    ]]
    chamfer11 = BRepFilletAPI_MakeChamfer(part_1.part.solid().wrapped)
    for e in chamfer11_edges_1:
        chamfer11.Add(CHAMFER11_SIZE, CHAMFER11_SIZE2, e.wrapped, chamfer11_side_1[0].wrapped)  # the first distance lies on this face
    for e in chamfer11_edges_2:
        chamfer11.Add(CHAMFER11_SIZE, CHAMFER11_SIZE2, e.wrapped, chamfer11_side_2[0].wrapped)  # the first distance lies on this face
    add(Compound.cast(chamfer11.Shape()), mode=Mode.REPLACE)

    # Chamfer12: one chamfer whose edges measure the first distance from different faces: ONE call of the kernel's chamfer builder (chamfer() names one face for all edges)
    chamfer12_edges_1 = [part_1.edges().sort_by_distance(p)[0] for p in [
        (46.208597122213995, 28.695197306810893, 3.6497899590838045),
    ]]
    chamfer12_side_1 = [part_1.faces().sort_by_distance(p)[0] for p in [
        (47.396342466238764, 28.695197306818734, 4.9689148024186895),
    ]]
    chamfer12_edges_2 = [part_1.edges().sort_by_distance(p)[0] for p in [
        (78.899397122214, 28.695197306805508, 3.6497899590828133),
    ]]
    chamfer12_side_2 = [part_1.faces().sort_by_distance(p)[0] for p in [
        (77.71165177818875, 28.695197306797276, 4.96891480241812),
    ]]
    chamfer12 = BRepFilletAPI_MakeChamfer(part_1.part.solid().wrapped)
    for e in chamfer12_edges_1:
        chamfer12.Add(CHAMFER12_SIZE, CHAMFER12_SIZE2, e.wrapped, chamfer12_side_1[0].wrapped)  # the first distance lies on this face
    for e in chamfer12_edges_2:
        chamfer12.Add(CHAMFER12_SIZE, CHAMFER12_SIZE2, e.wrapped, chamfer12_side_2[0].wrapped)  # the first distance lies on this face
    add(Compound.cast(chamfer12.Shape()), mode=Mode.REPLACE)

    # Sketch5 → Cut-Extrude2 (cut)
    with BuildSketch(Plane.XY.offset(6.35).offset(CUT_EXTRUDE2_START)):
        with Locations((44.272200000000005, 47.066199999999995)):
            Circle(SKETCH5_R)
        with Locations((80.84819999999999, 47.066199999999995)):
            Circle(SKETCH5_R)
        with Locations((75.184, 5.5118)):
            Circle(SKETCH5_R_2)
        with Locations((49.9364, 5.5118)):
            Circle(SKETCH5_R_2)
    extrude(amount=CUT_EXTRUDE2_DEPTH, mode=Mode.SUBTRACT)


solid = part_1.part
